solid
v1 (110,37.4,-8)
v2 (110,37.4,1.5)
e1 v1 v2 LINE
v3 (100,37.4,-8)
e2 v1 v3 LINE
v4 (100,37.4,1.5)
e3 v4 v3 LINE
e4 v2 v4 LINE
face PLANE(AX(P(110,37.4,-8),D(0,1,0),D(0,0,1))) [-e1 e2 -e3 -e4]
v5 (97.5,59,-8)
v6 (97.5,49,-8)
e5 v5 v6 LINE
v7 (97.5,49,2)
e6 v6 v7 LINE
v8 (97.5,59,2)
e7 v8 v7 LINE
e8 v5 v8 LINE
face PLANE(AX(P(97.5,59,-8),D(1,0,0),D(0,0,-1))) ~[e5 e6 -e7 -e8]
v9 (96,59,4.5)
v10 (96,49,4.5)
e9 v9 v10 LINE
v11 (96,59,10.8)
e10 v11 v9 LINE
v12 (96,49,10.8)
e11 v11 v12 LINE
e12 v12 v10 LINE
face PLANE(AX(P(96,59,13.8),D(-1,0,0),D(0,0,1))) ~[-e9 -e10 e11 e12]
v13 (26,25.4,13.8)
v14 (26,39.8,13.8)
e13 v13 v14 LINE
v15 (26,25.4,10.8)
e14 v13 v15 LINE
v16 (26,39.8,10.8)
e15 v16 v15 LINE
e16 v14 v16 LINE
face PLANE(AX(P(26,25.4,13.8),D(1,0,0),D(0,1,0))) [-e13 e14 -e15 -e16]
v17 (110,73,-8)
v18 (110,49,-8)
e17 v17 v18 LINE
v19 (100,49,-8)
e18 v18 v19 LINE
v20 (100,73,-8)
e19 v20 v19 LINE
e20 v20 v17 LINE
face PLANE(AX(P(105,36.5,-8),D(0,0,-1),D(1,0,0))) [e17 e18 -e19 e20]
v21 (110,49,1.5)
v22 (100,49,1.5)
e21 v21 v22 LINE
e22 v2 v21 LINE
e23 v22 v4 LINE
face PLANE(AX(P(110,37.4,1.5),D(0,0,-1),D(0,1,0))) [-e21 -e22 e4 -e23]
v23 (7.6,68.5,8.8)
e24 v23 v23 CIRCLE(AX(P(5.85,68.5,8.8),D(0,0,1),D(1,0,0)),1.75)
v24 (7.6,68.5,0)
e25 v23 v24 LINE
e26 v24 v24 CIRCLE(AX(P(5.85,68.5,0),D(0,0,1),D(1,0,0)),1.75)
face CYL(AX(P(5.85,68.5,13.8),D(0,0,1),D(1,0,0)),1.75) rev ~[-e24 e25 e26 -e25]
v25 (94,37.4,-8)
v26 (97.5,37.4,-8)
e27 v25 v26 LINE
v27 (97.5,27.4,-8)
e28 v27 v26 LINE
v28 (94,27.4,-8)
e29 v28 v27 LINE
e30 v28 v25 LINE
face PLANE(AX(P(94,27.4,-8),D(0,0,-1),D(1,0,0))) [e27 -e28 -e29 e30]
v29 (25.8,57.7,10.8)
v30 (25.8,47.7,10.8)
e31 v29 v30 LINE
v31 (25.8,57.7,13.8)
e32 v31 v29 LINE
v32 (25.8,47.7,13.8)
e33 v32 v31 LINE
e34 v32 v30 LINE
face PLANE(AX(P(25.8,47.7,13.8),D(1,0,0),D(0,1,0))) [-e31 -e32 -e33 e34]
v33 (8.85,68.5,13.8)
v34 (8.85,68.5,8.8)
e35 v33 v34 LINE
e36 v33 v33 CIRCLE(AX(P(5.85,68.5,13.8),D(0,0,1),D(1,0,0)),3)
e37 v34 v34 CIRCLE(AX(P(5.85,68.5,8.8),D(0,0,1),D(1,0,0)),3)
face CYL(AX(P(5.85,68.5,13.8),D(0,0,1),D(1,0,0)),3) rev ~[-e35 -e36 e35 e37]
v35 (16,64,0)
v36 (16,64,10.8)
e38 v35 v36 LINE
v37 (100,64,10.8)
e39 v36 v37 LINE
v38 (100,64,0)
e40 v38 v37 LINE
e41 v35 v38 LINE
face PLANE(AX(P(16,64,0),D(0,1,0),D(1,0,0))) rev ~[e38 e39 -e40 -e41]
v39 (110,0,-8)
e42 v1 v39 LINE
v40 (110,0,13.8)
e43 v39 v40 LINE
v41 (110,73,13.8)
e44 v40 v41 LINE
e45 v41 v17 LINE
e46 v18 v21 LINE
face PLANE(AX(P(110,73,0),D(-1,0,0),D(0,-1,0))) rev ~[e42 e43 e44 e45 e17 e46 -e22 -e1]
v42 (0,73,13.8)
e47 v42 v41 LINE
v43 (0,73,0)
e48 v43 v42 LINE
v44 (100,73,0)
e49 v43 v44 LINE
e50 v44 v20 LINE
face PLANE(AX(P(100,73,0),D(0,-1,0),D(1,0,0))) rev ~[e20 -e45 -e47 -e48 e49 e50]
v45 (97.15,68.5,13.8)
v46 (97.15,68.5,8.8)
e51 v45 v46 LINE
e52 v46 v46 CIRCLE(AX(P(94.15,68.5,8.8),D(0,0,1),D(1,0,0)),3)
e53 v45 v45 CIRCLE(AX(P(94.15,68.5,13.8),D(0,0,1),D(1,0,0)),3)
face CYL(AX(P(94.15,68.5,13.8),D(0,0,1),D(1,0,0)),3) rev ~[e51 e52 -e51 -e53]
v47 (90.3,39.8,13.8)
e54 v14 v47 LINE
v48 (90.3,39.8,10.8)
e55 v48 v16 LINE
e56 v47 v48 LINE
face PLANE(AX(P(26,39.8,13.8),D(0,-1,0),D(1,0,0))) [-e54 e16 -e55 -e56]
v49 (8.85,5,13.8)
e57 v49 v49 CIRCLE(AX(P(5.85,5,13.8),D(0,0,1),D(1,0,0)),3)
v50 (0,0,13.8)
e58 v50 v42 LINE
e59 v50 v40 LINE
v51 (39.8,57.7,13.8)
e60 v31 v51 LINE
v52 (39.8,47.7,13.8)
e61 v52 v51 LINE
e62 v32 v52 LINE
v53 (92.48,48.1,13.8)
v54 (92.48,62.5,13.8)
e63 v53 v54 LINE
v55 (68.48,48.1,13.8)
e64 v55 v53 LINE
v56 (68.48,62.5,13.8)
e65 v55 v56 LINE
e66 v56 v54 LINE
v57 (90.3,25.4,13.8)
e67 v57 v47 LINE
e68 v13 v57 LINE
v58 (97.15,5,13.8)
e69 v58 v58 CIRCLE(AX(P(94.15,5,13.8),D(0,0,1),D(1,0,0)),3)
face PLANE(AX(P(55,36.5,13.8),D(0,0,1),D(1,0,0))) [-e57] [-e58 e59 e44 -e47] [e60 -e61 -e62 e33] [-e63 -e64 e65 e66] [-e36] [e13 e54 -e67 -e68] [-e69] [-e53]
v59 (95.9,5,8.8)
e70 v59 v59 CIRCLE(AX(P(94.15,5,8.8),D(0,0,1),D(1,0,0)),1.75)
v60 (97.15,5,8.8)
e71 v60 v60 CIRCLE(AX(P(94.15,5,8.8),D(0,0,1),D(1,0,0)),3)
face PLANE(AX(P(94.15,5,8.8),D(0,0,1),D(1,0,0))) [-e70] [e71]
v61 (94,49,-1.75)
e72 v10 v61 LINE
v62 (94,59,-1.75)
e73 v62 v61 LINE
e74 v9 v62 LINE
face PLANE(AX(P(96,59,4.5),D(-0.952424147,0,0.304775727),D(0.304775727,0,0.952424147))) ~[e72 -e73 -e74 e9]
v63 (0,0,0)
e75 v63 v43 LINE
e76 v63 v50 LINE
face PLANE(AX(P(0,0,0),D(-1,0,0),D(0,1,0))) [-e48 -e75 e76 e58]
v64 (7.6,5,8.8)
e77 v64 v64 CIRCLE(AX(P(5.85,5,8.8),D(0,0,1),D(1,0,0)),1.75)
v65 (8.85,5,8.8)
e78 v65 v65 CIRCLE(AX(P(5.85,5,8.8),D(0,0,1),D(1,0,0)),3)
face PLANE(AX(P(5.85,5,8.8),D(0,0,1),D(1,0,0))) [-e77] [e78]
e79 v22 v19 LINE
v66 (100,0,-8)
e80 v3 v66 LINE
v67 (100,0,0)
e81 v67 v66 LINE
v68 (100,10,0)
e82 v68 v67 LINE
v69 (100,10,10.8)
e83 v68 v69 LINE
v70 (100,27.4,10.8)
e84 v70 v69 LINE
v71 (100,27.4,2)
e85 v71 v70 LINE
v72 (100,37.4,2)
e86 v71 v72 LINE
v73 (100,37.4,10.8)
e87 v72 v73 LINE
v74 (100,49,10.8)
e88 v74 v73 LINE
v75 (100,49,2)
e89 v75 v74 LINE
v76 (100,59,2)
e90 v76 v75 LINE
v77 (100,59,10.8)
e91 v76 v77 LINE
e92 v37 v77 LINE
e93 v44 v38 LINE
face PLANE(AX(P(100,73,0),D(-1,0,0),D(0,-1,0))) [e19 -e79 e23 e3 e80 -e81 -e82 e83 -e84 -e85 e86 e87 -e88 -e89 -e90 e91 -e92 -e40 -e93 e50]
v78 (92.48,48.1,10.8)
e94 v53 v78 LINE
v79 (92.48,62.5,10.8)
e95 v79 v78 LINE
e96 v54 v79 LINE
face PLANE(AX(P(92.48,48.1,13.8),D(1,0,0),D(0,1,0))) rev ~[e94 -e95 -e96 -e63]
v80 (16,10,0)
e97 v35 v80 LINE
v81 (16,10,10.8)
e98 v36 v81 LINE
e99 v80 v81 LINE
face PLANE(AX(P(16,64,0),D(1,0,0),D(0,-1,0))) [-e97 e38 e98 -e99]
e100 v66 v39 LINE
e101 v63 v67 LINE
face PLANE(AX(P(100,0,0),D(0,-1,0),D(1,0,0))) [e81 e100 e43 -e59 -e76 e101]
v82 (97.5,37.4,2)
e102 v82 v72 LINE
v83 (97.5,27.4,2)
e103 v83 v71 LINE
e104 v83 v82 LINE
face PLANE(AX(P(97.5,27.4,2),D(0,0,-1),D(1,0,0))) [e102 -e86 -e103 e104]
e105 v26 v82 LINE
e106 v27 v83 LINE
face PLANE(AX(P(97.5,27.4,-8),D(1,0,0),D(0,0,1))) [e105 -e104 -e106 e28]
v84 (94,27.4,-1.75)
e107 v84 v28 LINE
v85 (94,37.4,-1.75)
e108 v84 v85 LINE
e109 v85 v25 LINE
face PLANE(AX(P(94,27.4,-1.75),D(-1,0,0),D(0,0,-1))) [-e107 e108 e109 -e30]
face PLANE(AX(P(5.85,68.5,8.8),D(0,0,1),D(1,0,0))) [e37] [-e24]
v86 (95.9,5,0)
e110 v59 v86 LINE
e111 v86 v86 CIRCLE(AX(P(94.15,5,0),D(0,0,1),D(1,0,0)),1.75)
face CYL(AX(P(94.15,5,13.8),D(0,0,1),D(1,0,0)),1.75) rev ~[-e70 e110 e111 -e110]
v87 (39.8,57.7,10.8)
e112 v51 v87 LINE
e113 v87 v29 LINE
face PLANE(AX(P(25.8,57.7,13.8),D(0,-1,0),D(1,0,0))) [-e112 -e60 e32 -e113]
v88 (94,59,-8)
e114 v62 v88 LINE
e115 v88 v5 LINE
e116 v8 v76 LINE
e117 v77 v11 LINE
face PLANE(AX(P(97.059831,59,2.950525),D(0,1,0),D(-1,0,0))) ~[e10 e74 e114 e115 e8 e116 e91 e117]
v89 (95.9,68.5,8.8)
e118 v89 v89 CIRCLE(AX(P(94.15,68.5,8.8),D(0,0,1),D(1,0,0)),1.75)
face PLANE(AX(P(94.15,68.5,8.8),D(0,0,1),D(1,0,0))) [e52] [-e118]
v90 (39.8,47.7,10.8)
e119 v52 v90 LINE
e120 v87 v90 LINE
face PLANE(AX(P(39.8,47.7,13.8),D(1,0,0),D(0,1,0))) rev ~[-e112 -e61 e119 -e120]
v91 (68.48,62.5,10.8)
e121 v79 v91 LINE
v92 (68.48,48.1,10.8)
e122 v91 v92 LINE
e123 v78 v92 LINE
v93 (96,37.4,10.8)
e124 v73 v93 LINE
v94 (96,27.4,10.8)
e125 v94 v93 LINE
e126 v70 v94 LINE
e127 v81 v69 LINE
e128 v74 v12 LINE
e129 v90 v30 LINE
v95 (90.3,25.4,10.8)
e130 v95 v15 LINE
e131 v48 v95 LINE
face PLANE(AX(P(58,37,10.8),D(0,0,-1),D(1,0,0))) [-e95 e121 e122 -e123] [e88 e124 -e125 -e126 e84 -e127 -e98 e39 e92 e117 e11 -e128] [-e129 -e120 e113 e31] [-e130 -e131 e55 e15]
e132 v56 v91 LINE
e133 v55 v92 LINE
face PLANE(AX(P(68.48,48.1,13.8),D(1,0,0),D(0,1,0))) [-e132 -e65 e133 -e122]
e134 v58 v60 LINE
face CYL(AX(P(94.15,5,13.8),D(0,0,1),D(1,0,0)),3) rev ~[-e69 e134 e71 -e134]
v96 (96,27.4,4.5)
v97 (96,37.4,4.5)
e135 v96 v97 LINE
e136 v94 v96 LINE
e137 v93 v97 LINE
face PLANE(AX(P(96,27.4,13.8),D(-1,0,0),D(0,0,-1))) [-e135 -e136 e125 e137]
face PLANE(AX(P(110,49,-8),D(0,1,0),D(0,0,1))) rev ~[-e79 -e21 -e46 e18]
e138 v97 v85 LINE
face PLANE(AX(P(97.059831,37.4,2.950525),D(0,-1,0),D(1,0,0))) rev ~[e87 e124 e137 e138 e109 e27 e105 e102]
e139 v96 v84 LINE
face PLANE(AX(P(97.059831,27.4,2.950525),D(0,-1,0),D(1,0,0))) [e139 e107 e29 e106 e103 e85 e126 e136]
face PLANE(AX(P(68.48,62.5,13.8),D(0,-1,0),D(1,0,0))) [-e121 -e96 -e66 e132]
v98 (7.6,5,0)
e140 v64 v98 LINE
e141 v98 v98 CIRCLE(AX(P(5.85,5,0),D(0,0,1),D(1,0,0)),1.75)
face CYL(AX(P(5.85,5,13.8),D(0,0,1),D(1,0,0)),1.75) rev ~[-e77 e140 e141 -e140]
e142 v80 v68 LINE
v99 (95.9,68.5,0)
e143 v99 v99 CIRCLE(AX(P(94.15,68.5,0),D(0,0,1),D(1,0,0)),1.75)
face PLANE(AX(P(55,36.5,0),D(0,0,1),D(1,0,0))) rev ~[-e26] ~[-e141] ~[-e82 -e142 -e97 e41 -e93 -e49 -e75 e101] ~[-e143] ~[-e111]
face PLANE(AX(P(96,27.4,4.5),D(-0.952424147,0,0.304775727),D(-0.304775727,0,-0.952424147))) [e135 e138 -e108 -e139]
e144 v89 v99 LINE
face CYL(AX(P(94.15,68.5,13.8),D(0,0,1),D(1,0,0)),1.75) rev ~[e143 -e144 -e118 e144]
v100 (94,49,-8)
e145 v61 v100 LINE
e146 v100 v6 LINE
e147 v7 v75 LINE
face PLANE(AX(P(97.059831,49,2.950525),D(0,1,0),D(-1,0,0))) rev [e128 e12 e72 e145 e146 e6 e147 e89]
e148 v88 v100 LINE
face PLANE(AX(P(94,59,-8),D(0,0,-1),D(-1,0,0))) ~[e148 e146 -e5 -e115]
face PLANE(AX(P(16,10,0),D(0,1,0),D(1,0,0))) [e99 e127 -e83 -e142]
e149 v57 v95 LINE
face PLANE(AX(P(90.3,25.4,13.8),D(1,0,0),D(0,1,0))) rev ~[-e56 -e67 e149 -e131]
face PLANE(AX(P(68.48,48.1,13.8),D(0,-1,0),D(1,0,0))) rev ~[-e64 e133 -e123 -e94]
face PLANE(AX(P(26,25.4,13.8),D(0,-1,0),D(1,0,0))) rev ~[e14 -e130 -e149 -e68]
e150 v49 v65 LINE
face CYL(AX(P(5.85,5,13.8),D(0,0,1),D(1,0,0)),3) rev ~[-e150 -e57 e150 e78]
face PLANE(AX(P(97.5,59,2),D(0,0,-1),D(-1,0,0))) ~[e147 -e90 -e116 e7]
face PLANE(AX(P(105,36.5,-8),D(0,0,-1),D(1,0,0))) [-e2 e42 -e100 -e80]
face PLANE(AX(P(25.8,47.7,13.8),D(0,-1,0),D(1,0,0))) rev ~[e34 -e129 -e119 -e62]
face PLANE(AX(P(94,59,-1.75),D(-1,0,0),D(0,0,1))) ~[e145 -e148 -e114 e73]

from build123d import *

# Parameters (mm, degrees)
F0_W      = 110
F0_H      = 73
F1_DEPTH  = 13.8
F2_W      = 84
F2_H      = 54
F3_DEPTH  = 10.8
F4_W      = 10
F4_H      = 73
F5_DEPTH  = 8
F6_R      = 1.75
F7_DEPTH  = 25
F8_R      = 3
F9_DEPTH  = 5
F10_W     = 64.3
F10_H     = 14.4
F10_W_2   = 24
F10_W_3   = 14
F10_H_2   = 10
F11_DEPTH = 25
F12_W     = 11.6
F12_H     = 9.5
F13_DEPTH = 25
F15_START = -27.4
F15_DEPTH = 10


# Not quite as in the source:
# - a pattern or mirror of a feature is missing from the dataset's text; its kind, count and spacing are read off the source's solid


with BuildPart() as f1:
    # F0 (on Top) → F1 (new body)
    with BuildSketch(Plane.XY):
        with Locations((55, 36.5)):
            Rectangle(F0_W, F0_H)
    extrude(amount=F1_DEPTH)

    # F2 (on face) → F3 (cut)
    with BuildSketch(Plane(origin=(0, 0, 0), x_dir=(1, 0, 0), z_dir=(0, 0, -1))):
        with Locations((58, -37)):
            Rectangle(F2_W, F2_H)
    extrude(amount=-F3_DEPTH, mode=Mode.SUBTRACT)

    # F4 (on face) → F5 (join)
    with BuildSketch(Plane(origin=(0, 0, 0), x_dir=(1, 0, 0), z_dir=(0, 0, -1))):
        with Locations((105, -36.5)):
            Rectangle(F4_W, F4_H)
    extrude(amount=F5_DEPTH)

    # F6 (on face) → F7 (cut)
    with BuildSketch(Plane.XY.offset(13.8)):
        with Locations((5.85, 5)):
            Circle(F6_R)
        with Locations((94.15, 5)):
            Circle(F6_R)
        with Locations((94.15, 68.5)):
            Circle(F6_R)
        with Locations((5.85, 68.5)):
            Circle(F6_R)
    extrude(amount=-F7_DEPTH, mode=Mode.SUBTRACT)

    # F8 (on face) → F9 (cut)
    with BuildSketch(Plane.XY.offset(13.8)):
        with Locations((5.85, 68.5)):
            Circle(F8_R)
        with Locations((5.85, 5)):
            Circle(F8_R)
        with Locations((94.15, 5)):
            Circle(F8_R)
        with Locations((94.15, 68.5)):
            Circle(F8_R)
    extrude(amount=-F9_DEPTH, mode=Mode.SUBTRACT)

    # F10 (on face) → F11 (cut)
    with BuildSketch(Plane.XY.offset(13.8)):
        with Locations((58.15, 32.6)):
            Rectangle(F10_W, F10_H)
        with Locations((80.48, 55.3)):
            Rectangle(F10_W_2, F10_H)
        with Locations((32.8, 52.7)):
            Rectangle(F10_W_3, F10_H_2)
    extrude(amount=-F11_DEPTH, mode=Mode.SUBTRACT)

    # F12 (on face) → F13 (cut)
    with BuildSketch(Plane.YZ.offset(110)):
        with Locations((43.2, -3.25)):
            Rectangle(F12_W, F12_H)
    extrude(amount=-F13_DEPTH, mode=Mode.SUBTRACT)

    # F14 (on face) → F15 (join)
    with BuildSketch(Plane.XZ.offset(F15_START)):
        Polygon((94, -8), (97.5, -8), (97.5, 2), (100, 2), (100, 4.5), (100, 13.8), (96, 13.8), (96, 4.5), (94, -1.75), align=None)
    f15 = extrude(amount=-F15_DEPTH)

    # F15_copies: F15 across plane
    add(f15.mirror(Plane.ZX.offset(43.2)))


solid = f1.part
